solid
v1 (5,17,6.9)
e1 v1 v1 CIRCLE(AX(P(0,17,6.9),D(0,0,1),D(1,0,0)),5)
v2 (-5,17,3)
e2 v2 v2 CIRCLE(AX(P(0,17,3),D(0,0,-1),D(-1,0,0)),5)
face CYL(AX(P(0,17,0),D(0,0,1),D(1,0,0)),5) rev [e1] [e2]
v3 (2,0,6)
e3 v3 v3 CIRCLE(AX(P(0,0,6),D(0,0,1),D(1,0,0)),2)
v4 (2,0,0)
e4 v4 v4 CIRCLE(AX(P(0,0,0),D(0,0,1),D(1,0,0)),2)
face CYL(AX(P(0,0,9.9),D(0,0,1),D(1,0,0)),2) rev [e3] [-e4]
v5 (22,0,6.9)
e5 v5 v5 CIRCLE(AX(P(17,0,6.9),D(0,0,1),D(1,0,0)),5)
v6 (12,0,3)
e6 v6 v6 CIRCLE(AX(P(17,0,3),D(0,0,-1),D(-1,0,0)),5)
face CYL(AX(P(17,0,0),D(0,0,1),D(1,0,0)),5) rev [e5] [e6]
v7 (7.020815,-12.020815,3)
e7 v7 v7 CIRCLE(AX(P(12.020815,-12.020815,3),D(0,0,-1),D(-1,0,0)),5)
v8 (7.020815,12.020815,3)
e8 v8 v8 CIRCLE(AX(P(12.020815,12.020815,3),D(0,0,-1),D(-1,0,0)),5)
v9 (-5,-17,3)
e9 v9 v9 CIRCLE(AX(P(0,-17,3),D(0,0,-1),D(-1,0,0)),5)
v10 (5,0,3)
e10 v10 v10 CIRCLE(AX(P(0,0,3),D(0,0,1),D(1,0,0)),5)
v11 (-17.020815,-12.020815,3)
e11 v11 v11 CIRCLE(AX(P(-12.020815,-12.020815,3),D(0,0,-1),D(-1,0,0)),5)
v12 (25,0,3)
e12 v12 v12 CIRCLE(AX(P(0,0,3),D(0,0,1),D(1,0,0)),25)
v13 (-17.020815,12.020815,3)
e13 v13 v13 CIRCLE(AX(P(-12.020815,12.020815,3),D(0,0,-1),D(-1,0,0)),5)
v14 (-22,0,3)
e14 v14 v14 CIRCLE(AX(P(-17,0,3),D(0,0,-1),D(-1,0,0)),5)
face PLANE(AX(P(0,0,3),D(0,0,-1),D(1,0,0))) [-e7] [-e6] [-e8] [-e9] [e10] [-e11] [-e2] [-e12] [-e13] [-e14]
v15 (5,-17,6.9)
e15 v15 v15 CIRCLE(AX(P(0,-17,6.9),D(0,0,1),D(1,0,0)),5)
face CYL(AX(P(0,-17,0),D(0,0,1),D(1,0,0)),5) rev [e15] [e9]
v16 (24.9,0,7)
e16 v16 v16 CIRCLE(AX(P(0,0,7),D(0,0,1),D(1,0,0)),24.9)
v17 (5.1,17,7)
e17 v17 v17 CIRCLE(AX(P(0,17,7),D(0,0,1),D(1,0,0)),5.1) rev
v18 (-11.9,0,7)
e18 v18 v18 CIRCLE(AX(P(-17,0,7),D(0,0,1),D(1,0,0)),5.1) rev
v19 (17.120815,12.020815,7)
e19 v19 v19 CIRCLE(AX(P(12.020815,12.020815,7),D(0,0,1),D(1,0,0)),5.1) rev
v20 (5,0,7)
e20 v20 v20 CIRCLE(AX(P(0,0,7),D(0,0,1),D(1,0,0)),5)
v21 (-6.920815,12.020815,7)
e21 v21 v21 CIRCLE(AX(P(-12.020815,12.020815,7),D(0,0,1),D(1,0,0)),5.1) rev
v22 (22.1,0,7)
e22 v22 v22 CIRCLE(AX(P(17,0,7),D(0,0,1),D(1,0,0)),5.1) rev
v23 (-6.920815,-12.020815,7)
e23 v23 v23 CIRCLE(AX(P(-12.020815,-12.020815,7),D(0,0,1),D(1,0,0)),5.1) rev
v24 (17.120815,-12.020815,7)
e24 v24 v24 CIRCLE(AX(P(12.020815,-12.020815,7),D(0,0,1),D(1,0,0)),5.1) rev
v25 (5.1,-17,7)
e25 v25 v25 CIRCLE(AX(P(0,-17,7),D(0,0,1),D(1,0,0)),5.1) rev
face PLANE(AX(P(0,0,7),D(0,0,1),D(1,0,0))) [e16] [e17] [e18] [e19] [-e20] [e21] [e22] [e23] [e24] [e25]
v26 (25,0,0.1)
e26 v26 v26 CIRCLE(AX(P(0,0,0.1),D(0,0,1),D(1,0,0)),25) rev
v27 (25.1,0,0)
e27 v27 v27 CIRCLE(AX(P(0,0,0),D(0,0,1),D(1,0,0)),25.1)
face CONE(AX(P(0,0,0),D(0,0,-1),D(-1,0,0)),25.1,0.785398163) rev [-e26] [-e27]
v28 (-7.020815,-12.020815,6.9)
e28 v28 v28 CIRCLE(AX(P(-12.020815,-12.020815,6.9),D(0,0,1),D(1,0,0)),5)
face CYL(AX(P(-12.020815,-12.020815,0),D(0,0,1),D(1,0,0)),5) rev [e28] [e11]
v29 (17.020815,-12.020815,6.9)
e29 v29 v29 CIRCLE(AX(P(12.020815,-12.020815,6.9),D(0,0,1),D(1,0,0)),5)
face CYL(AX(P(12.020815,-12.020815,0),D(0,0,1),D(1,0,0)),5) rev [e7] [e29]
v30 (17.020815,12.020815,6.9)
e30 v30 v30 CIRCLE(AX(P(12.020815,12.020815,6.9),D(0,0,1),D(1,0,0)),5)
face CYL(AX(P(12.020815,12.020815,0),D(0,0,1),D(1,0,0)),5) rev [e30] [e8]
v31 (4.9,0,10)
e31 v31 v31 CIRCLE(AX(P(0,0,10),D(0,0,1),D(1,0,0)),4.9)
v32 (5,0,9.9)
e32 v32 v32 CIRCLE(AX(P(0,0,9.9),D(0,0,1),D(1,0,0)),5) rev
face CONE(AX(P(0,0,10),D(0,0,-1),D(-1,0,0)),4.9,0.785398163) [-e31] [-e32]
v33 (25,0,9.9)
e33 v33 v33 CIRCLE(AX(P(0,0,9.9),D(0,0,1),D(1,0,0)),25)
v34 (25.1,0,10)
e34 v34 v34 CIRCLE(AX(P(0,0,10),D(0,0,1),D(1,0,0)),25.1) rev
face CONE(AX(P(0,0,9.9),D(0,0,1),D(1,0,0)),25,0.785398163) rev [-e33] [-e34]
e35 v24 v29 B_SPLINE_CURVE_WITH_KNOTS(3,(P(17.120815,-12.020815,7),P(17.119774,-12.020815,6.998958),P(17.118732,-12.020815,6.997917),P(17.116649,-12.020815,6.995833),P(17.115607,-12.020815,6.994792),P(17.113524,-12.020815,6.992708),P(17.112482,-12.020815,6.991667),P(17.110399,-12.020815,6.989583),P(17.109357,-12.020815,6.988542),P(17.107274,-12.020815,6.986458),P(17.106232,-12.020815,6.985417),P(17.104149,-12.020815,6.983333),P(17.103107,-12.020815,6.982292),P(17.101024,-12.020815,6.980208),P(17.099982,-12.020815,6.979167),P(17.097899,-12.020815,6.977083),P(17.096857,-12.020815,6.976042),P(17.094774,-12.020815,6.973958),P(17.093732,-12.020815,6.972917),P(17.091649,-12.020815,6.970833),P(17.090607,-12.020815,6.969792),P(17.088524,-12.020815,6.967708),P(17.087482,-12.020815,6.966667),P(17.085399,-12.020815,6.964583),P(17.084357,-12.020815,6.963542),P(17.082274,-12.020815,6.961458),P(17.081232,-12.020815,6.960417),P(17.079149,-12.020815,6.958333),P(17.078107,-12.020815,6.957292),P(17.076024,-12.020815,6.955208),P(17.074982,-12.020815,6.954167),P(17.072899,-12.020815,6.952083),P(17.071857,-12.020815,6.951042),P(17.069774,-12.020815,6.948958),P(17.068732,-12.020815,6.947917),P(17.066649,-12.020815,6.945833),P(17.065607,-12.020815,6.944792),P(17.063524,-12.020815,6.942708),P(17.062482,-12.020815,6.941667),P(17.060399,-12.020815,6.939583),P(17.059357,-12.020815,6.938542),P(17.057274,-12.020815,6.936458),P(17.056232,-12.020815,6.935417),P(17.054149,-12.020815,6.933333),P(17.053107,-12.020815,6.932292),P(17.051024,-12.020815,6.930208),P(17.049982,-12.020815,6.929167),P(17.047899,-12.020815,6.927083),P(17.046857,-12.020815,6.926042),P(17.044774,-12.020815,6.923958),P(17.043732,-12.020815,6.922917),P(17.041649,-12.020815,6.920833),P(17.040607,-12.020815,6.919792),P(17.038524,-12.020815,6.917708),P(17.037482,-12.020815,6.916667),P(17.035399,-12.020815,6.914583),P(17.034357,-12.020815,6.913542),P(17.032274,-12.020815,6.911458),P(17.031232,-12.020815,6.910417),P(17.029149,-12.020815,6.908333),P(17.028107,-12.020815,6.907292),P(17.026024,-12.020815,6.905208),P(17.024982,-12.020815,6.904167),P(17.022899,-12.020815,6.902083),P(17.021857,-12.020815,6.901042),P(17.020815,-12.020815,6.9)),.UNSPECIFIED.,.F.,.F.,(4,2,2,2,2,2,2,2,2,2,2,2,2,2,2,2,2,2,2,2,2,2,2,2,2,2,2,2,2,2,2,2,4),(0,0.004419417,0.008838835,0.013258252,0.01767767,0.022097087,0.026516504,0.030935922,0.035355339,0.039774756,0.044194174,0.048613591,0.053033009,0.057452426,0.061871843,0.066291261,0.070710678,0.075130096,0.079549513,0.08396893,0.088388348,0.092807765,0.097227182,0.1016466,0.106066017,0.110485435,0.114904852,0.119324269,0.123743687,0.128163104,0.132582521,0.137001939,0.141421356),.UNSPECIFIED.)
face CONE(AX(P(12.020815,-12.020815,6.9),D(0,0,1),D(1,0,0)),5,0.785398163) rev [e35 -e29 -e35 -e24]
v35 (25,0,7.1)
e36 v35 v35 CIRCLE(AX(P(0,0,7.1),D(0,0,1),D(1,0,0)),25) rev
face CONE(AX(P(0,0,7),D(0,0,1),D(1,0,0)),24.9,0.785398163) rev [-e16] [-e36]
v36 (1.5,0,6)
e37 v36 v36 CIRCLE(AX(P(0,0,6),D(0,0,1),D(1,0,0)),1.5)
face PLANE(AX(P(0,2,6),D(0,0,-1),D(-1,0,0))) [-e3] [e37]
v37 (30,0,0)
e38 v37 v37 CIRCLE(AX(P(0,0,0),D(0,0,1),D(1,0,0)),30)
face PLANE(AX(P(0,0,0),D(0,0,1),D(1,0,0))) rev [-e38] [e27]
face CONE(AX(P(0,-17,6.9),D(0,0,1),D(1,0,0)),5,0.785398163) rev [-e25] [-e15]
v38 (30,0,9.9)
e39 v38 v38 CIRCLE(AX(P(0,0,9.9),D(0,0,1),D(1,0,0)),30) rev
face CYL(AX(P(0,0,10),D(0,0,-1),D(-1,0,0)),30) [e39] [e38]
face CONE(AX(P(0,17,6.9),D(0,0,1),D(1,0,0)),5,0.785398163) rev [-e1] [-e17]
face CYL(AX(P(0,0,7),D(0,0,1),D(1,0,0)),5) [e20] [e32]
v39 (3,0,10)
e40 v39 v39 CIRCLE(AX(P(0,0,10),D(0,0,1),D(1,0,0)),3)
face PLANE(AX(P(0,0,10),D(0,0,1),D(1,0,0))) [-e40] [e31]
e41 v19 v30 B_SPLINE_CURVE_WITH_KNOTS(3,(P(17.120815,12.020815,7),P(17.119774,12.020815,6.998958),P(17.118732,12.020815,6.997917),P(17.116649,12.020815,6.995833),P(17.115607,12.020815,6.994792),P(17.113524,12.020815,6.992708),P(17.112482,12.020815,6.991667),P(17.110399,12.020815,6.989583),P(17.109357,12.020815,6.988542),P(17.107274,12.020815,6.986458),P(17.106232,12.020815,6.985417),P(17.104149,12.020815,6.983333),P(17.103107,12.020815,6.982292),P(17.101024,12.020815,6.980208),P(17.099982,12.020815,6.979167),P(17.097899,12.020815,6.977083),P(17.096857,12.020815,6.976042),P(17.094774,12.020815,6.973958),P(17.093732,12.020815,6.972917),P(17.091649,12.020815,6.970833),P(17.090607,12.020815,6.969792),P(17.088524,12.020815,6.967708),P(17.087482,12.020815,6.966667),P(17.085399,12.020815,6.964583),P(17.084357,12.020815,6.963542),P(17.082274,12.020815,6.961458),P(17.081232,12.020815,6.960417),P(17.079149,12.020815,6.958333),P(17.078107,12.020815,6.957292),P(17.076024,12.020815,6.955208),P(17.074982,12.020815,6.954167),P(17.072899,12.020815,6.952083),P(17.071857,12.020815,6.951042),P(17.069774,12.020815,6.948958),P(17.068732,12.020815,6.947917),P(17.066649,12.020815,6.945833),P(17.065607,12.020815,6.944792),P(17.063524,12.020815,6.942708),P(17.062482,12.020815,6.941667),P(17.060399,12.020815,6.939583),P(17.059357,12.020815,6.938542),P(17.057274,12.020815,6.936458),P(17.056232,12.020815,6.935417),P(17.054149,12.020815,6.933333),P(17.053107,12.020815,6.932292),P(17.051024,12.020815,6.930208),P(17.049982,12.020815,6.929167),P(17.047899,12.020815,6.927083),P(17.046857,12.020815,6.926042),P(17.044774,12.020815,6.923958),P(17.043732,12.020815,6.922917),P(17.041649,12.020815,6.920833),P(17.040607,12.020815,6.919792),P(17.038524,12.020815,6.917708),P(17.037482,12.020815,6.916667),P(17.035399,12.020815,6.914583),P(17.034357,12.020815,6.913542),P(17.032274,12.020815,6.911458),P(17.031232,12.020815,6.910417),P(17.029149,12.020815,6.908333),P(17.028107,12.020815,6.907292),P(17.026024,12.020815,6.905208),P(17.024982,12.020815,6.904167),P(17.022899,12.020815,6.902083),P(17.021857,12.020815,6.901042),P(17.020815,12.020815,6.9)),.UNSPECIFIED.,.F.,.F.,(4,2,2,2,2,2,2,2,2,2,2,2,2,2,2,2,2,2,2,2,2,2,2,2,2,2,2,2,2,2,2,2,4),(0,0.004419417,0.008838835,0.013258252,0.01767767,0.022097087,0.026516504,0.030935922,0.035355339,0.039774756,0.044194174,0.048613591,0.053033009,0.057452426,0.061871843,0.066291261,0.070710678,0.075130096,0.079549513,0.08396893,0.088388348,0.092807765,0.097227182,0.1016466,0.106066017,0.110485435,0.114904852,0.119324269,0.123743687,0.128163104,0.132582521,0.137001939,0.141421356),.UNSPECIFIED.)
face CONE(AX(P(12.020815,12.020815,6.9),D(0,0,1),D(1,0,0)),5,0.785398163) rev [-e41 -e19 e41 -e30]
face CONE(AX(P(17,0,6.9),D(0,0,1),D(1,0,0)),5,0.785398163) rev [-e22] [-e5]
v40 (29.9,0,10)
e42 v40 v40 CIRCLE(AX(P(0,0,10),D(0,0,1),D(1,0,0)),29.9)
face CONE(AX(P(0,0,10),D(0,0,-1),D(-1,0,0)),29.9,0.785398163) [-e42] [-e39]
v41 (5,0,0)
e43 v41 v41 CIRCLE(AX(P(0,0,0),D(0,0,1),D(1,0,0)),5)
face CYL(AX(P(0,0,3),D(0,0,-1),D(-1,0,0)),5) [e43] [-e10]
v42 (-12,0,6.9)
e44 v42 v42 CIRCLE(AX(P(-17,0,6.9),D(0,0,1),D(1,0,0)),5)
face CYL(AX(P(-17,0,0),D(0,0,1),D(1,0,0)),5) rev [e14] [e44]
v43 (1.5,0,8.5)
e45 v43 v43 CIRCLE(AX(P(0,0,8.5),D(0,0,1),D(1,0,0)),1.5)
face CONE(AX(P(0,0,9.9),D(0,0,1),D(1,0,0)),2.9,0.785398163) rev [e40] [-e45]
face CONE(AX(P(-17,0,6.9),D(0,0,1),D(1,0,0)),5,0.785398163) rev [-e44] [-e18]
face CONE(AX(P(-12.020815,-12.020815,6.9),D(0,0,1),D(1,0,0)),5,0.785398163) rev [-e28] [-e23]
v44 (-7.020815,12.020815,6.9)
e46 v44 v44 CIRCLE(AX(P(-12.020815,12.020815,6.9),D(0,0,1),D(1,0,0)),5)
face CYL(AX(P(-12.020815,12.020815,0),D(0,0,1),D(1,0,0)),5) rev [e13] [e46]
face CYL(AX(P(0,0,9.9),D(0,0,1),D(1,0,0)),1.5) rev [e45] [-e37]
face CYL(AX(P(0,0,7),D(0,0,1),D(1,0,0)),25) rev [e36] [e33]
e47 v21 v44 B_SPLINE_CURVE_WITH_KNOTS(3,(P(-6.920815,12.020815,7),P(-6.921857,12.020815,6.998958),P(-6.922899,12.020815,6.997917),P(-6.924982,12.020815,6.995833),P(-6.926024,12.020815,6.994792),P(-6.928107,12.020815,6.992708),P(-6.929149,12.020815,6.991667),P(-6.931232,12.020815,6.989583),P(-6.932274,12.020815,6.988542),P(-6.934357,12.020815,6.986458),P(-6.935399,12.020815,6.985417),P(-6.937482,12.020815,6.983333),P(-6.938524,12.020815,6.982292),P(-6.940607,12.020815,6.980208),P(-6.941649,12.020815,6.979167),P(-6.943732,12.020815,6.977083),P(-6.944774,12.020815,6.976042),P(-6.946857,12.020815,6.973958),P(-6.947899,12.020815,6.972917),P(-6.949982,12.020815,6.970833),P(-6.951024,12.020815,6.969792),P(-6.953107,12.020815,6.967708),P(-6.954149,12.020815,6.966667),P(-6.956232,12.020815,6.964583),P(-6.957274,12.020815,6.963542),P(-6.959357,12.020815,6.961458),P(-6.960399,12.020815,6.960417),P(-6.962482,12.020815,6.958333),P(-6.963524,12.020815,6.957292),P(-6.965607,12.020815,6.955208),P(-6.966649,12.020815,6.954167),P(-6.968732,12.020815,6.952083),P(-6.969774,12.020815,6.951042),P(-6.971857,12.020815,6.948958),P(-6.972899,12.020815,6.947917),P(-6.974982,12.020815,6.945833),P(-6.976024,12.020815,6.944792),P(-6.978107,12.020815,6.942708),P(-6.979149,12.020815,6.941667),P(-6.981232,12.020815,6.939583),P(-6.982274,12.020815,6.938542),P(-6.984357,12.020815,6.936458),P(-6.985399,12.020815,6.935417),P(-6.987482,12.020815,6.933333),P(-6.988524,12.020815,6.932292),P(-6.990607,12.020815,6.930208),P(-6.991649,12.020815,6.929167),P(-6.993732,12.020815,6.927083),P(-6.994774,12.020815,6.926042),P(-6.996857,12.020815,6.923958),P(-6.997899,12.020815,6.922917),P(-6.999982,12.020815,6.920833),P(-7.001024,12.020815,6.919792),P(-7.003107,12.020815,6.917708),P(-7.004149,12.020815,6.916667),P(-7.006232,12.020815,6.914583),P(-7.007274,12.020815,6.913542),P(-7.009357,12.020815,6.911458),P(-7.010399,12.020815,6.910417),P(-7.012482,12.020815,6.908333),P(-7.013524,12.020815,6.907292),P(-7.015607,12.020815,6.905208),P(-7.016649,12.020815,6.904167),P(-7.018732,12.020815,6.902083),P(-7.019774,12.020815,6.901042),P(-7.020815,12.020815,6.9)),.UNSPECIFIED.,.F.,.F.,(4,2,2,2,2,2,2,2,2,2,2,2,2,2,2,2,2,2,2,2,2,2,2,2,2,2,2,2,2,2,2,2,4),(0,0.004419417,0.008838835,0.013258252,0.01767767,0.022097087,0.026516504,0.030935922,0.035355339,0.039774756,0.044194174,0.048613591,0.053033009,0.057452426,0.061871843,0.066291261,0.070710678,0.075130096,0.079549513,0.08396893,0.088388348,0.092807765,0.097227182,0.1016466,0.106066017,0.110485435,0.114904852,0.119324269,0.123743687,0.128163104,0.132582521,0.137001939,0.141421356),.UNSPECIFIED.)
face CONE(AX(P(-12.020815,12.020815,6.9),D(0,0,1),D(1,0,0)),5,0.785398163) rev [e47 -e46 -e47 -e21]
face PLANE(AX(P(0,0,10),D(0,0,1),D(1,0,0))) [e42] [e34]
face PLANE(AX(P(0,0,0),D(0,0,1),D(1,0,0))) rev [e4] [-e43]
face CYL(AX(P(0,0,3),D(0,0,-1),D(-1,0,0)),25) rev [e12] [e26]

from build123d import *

# Parameters (mm, degrees)
SKETCH2_R           = 30
BOSS_EXTRUDE1_DEPTH = 10
SKETCH3_R           = 25
SKETCH3_R_2         = 5
CUT_EXTRUDE1_DEPTH  = 3
SKETCH4_R           = 5
CUT_EXTRUDE2_DEPTH  = 44
CHAMFER1_SIZE       = 0.1


# Read off the part's stored shape, not the designer's step: Cut-Revolve1
with BuildPart() as part:
    # Sketch2 → Boss-Extrude1 (new body)
    with BuildSketch(Plane.XY):
        Circle(SKETCH2_R)
    extrude(amount=BOSS_EXTRUDE1_DEPTH)

    # Sketch3 → Cut-Extrude1 (cut)
    with BuildSketch(Plane.XY.offset(10)):
        Circle(SKETCH3_R)
        Circle(SKETCH3_R_2, mode=Mode.SUBTRACT)
    cut_extrude1 = extrude(amount=-CUT_EXTRUDE1_DEPTH, mode=Mode.SUBTRACT)

    # Mirror2: Cut-Extrude1 across plane
    add(cut_extrude1.mirror(Plane.XY.offset(5)), mode=Mode.SUBTRACT)

    # Sketch4 → Cut-Extrude2 (cut, through all)
    with BuildSketch(Plane.XY.offset(7)):
        with Locations((0, 17)):
            Circle(SKETCH4_R)
        with Locations((12.02081528, 12.02081528)):
            Circle(SKETCH4_R)
        with Locations((17, 0)):
            Circle(SKETCH4_R)
        with Locations((12.02081528, -12.02081528)):
            Circle(SKETCH4_R)
        with Locations((0, -17)):
            Circle(SKETCH4_R)
        with Locations((-12.02081528, -12.02081528)):
            Circle(SKETCH4_R)
        with Locations((-17, 0)):
            Circle(SKETCH4_R)
        with Locations((-12.02081528, 12.02081528)):
            Circle(SKETCH4_R)
    extrude(amount=-CUT_EXTRUDE2_DEPTH, mode=Mode.SUBTRACT)

    # Chamfer1
    chamfer1_edges = [part.edges().sort_by_distance(p)[0] for p in [
        (-25, 0, 0),
        (-17.02081528, 12.02081528, 7),
        (-22, 0, 7),
        (-17.02081528, -12.02081528, 7),
        (-5, -17, 7),
        (7.02081528, -12.02081528, 7),
        (12, 0, 7),
        (7.02081528, 12.02081528, 7),
        (-5, 17, 7),
        (-30, 0, 10),
        (-25, 0, 7),
        (-25, 0, 10),
        (-5, 0, 10),
    ]]
    chamfer(chamfer1_edges, length=CHAMFER1_SIZE)

    # Cut-Revolve1 outline → Cut-Revolve1 (revolve, cut)
    with BuildSketch(Plane.XZ):
        Polygon((2, 0), (2, 6), (1.5, 6), (1.5, 8.5), (3, 10), (0, 10), (0, 0), align=None)
    revolve(axis=Axis((0, 0, 0), (0, 0, 1)), mode=Mode.SUBTRACT)


solid = part.part
